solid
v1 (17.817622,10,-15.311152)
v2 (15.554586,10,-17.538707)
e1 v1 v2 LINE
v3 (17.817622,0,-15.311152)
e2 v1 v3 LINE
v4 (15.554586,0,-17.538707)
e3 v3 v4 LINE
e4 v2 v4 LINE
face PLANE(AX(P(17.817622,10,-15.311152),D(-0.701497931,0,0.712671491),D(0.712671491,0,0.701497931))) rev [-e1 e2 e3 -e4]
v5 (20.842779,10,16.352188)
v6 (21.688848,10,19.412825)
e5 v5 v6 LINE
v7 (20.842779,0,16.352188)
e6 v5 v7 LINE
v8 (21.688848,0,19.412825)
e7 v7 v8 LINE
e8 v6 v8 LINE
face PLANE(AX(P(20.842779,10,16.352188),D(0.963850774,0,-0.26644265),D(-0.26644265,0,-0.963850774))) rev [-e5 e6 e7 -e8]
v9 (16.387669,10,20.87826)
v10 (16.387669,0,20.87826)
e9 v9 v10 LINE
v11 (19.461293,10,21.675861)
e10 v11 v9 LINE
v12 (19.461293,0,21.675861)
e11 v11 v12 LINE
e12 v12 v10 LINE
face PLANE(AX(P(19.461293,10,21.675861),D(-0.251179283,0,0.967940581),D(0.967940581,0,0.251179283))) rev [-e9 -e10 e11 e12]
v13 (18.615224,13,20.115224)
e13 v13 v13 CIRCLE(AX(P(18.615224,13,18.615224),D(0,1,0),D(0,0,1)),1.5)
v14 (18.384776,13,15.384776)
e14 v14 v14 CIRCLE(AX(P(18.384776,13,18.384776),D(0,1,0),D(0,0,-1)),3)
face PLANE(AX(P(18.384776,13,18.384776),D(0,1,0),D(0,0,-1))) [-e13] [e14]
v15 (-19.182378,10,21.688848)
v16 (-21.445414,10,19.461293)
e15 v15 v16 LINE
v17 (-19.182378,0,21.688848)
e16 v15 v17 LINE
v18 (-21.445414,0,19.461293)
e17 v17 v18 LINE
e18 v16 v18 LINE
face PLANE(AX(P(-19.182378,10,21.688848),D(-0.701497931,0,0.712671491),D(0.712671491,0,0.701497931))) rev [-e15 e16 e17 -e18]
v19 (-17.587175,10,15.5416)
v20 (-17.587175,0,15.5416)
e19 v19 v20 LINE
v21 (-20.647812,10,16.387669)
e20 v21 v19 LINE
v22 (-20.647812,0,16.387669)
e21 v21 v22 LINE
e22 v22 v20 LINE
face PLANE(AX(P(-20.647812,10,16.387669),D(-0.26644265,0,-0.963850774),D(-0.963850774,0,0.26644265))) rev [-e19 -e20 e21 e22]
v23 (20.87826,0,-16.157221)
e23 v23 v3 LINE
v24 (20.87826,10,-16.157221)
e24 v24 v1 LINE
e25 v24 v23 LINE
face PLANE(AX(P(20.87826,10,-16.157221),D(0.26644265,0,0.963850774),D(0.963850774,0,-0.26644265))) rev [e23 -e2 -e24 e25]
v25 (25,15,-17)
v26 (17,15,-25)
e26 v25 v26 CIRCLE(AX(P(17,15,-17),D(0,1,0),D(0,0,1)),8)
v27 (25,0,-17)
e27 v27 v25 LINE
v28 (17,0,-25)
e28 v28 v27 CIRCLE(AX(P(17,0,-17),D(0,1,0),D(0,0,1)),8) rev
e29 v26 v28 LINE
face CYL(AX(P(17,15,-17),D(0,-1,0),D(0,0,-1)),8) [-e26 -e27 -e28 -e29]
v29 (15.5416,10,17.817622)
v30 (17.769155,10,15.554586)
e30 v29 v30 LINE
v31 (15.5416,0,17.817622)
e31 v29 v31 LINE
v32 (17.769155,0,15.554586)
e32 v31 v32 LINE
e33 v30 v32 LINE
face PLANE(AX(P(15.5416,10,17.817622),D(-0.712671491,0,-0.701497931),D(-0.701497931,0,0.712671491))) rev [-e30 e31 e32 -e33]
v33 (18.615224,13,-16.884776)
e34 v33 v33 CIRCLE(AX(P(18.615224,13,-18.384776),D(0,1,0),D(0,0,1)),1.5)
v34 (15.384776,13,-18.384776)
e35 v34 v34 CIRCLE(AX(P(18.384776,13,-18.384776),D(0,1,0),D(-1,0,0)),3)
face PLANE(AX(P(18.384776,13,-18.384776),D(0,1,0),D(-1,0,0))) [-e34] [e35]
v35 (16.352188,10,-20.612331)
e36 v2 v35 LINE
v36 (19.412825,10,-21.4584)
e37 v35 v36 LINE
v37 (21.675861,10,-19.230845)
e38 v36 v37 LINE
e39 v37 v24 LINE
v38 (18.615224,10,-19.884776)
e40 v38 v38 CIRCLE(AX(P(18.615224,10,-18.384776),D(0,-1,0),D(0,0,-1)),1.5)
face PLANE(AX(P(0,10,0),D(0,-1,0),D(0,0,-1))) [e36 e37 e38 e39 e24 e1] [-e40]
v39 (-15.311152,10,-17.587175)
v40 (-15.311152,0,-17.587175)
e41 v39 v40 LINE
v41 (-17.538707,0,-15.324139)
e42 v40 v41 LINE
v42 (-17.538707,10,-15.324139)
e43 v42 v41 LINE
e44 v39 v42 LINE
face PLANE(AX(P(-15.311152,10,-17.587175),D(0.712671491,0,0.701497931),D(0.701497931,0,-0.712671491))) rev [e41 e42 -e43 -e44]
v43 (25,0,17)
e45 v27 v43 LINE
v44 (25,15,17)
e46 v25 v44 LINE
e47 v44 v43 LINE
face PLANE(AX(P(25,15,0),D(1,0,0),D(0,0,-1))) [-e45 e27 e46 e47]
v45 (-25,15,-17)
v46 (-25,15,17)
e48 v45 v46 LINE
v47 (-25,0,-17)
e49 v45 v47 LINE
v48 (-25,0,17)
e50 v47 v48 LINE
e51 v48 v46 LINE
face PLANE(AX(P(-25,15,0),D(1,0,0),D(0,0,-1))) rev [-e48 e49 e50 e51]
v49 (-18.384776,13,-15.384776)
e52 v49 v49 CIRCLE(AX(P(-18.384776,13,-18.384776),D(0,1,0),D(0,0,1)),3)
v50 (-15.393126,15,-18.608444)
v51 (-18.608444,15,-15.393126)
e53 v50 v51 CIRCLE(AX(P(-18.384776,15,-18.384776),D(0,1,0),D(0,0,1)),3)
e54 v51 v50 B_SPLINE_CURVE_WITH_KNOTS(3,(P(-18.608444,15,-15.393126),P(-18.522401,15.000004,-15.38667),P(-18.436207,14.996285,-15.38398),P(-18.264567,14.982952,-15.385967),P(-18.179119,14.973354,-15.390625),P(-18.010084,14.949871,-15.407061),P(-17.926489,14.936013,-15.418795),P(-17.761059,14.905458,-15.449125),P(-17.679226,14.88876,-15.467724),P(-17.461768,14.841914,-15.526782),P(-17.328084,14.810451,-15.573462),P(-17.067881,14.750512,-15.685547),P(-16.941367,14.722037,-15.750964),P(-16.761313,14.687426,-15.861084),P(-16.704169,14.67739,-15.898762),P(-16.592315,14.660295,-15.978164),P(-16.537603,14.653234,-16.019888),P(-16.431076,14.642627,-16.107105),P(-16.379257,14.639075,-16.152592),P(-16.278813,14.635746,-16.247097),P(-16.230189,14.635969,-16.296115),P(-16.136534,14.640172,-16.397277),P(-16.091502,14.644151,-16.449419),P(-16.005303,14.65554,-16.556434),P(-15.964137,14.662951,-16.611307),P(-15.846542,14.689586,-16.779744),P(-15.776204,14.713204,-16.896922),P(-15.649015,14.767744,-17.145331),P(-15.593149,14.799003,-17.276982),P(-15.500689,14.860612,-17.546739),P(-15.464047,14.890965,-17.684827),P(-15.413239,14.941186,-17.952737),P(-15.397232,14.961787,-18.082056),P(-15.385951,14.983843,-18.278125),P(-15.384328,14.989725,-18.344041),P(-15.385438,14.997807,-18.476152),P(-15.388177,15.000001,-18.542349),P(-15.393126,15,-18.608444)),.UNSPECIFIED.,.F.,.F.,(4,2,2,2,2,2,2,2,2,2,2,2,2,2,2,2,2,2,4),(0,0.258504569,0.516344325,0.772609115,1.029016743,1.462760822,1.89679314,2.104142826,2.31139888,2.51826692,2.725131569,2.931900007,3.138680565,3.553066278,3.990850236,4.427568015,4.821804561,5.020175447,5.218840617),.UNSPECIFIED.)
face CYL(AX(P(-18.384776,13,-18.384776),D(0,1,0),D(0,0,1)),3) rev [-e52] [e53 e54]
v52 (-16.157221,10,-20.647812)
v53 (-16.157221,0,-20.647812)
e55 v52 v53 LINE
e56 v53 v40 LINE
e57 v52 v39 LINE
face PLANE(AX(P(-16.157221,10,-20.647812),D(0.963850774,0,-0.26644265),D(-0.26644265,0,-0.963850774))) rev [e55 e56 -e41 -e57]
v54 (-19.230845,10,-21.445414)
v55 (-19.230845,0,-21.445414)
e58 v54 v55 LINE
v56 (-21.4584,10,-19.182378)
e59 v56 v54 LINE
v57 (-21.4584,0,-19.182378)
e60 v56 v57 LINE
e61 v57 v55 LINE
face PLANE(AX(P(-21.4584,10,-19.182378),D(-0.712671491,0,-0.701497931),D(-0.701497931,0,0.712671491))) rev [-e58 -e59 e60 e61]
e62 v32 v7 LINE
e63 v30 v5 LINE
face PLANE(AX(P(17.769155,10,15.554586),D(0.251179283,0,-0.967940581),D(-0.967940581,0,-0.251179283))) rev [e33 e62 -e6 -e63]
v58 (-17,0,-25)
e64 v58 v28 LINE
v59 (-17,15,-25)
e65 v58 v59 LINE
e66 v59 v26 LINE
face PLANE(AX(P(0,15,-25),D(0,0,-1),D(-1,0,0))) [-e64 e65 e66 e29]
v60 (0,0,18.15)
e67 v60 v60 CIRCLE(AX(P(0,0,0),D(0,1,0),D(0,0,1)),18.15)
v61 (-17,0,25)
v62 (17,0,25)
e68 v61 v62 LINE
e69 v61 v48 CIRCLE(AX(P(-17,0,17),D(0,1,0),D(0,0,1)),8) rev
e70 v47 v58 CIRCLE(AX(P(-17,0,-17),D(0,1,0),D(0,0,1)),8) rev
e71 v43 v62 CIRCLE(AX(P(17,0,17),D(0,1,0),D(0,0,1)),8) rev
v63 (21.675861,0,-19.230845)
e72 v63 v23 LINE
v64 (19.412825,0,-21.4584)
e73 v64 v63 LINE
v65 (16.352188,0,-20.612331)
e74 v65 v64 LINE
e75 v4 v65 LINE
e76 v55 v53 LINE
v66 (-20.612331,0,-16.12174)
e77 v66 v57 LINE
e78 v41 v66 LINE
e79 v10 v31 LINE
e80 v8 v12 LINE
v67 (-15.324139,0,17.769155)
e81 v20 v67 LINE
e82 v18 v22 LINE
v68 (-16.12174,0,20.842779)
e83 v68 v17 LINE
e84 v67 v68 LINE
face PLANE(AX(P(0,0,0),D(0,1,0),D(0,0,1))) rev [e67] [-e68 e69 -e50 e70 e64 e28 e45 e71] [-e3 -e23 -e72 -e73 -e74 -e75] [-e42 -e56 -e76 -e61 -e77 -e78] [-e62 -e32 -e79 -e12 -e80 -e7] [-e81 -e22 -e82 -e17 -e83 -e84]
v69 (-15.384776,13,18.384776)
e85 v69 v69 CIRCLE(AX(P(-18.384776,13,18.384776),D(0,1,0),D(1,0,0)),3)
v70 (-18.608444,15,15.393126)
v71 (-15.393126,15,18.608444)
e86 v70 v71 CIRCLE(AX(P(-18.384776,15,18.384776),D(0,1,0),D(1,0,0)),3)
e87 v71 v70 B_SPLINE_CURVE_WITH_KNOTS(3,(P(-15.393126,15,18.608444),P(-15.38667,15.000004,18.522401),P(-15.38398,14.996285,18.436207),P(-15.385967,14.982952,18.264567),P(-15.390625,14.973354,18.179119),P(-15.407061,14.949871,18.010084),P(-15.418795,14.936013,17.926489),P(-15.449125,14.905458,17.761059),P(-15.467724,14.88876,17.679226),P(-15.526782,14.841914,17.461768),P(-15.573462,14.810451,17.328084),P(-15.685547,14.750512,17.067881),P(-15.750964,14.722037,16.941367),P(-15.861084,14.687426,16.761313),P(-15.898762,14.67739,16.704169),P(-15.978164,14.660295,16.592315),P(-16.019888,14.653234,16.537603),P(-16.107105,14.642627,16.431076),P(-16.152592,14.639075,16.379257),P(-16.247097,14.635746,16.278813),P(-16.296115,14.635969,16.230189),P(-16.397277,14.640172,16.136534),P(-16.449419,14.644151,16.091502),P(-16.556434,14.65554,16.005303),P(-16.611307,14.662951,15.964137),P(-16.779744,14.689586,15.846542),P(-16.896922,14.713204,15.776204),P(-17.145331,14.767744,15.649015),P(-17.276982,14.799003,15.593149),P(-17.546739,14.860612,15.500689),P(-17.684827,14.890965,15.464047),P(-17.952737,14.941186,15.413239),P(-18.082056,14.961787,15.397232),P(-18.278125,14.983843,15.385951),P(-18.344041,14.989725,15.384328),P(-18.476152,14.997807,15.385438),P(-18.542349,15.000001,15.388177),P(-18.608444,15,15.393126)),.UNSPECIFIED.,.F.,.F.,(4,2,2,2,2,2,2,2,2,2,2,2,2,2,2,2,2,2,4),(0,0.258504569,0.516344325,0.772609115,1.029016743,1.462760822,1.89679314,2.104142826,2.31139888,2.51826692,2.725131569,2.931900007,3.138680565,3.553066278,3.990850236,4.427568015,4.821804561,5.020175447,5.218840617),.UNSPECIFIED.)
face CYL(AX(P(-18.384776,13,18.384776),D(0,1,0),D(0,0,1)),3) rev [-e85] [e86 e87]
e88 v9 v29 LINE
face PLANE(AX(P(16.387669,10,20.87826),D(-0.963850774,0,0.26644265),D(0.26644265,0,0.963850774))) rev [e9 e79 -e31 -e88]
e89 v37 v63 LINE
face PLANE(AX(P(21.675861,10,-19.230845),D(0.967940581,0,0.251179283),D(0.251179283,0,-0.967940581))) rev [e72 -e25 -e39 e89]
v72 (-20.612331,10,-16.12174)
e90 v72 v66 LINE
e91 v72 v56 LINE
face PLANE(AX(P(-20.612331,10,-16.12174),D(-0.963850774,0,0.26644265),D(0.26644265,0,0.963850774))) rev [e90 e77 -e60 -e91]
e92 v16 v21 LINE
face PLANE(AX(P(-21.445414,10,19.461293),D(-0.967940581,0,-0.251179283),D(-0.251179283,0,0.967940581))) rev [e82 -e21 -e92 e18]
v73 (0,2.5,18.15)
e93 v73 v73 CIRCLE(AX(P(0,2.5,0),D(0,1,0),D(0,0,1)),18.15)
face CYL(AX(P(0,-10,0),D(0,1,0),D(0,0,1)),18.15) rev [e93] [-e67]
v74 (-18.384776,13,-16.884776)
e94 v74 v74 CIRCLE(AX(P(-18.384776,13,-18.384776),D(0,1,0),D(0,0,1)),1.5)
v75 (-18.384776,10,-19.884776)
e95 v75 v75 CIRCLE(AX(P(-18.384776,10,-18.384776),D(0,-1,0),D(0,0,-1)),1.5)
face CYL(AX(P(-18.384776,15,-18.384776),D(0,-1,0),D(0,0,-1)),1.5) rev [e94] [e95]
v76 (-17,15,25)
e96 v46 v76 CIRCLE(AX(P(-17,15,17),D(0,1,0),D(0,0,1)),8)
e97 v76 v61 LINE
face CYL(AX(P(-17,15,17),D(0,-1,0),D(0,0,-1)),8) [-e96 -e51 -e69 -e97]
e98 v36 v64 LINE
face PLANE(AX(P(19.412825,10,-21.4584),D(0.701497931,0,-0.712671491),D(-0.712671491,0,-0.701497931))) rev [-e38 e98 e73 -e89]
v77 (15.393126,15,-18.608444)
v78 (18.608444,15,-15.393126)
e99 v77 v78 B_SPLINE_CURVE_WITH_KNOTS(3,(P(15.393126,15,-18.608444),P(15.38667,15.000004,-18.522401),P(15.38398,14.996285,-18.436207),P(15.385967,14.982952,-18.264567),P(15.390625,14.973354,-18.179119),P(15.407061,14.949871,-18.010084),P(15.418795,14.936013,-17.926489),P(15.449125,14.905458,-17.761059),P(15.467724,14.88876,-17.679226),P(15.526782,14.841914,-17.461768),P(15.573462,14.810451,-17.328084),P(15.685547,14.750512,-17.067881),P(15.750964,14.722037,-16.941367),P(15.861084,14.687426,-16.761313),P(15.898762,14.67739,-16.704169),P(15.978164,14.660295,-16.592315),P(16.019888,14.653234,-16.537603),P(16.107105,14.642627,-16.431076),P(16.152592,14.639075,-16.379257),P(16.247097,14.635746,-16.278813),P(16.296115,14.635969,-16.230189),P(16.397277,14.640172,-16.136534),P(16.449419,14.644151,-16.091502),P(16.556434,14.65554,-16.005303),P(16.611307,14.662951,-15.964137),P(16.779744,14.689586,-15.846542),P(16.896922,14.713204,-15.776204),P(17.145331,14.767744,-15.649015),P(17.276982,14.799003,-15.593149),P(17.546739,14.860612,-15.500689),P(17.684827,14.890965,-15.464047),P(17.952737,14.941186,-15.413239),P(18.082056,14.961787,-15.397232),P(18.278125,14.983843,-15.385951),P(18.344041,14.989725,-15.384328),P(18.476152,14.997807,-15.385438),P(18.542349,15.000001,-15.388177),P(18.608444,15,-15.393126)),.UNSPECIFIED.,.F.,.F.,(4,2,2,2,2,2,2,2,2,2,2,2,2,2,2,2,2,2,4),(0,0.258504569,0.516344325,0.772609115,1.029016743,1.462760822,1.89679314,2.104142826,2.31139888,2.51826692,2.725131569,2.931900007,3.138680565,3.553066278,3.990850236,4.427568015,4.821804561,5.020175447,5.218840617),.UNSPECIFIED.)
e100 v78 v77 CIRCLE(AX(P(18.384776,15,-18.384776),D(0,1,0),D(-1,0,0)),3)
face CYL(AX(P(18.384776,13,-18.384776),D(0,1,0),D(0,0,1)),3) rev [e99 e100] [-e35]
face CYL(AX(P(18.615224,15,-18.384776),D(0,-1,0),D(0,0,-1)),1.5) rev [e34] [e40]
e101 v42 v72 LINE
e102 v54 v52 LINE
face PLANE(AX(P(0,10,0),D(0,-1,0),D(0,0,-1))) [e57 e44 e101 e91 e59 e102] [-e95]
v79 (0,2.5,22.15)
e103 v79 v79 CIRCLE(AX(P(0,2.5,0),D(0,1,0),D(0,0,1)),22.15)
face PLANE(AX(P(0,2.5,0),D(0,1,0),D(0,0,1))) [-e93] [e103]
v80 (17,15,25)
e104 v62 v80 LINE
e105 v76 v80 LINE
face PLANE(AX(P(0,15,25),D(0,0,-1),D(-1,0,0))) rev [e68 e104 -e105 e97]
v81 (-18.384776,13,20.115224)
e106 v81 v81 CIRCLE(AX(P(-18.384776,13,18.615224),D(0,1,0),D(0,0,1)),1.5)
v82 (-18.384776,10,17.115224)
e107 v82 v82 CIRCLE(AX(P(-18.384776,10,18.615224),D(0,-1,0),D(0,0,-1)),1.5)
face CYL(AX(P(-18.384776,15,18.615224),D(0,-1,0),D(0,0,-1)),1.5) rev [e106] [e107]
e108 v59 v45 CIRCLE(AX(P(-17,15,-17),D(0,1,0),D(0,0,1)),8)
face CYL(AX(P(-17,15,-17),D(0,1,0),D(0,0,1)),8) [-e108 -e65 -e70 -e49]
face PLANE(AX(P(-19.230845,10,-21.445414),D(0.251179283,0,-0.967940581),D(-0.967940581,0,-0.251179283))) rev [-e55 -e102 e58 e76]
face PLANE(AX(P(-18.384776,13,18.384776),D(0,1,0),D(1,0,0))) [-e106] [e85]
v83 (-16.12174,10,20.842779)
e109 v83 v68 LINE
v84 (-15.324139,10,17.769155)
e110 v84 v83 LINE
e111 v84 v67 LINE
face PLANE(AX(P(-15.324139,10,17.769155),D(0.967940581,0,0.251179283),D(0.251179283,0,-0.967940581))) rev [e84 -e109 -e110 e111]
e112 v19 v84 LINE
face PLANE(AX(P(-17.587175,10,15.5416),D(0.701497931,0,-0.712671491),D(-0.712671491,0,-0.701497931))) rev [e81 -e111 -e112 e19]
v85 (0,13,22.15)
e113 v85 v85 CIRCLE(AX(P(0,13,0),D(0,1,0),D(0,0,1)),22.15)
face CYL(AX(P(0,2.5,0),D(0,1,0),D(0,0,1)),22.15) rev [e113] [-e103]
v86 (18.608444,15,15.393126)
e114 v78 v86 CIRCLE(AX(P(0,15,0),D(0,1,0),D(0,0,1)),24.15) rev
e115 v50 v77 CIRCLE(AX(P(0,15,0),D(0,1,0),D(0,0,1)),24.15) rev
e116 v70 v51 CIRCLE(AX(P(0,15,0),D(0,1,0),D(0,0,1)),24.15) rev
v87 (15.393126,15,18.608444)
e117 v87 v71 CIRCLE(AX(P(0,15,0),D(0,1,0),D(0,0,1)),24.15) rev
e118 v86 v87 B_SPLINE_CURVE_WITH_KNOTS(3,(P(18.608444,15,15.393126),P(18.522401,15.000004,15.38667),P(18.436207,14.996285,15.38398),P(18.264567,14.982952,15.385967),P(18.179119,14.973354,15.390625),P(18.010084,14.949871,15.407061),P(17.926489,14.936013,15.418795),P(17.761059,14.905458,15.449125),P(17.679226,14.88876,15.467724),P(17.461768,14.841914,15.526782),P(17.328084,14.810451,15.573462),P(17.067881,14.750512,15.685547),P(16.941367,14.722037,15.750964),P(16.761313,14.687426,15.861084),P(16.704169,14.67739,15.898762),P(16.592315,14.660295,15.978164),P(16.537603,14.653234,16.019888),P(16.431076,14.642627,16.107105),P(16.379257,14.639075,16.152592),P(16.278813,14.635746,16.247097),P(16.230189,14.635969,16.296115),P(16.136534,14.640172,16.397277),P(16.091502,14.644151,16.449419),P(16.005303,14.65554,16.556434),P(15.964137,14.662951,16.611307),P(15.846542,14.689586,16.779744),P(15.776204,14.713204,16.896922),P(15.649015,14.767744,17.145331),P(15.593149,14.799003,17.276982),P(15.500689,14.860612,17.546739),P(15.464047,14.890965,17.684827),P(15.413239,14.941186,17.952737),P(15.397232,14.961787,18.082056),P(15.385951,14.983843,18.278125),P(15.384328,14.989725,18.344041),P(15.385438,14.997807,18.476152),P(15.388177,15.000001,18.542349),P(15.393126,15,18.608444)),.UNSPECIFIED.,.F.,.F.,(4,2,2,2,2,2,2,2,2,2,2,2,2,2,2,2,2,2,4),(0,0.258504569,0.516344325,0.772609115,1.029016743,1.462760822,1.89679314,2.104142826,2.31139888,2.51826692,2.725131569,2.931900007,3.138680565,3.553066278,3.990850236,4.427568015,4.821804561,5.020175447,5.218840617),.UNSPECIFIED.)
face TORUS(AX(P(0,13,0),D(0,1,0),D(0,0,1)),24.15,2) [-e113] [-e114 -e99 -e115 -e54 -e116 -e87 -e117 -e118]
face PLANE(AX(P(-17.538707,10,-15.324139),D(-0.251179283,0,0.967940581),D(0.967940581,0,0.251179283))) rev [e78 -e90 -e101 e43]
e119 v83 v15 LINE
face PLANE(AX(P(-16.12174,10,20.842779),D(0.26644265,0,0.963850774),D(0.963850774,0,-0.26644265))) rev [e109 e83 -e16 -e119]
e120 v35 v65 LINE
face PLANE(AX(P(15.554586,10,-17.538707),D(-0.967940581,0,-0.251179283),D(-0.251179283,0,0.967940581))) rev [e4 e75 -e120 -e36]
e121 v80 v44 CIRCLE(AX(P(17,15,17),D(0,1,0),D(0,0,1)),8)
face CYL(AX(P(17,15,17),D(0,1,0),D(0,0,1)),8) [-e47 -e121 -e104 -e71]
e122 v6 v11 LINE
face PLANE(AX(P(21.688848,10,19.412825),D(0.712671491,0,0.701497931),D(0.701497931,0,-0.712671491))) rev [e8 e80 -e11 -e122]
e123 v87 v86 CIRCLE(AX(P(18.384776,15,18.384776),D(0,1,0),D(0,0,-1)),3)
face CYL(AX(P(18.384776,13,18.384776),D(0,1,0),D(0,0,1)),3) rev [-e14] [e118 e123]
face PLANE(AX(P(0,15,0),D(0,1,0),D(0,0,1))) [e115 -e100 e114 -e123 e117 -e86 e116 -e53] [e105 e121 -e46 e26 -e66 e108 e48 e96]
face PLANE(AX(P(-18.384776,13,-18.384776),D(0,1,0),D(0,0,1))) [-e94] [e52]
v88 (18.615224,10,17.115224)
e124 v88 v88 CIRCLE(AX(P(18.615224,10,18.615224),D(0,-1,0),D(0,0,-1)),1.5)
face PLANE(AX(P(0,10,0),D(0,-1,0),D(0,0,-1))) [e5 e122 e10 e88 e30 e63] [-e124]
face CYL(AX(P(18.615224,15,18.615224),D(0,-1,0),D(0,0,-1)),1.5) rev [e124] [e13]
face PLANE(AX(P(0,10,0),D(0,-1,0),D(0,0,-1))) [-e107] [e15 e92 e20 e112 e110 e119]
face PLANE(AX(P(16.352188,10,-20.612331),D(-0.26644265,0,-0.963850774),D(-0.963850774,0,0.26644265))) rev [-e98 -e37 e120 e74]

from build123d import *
from build123d.topology import SkipClean

# Parameters (mm, degrees)
SKETCH_1_R               = 25
EXTRUDE_1_DEPTH          = 15
SKETCH_2_R               = 22.15
CUT_EXTRUDE_1_DEPTH      = 12.5
SKETCH_3_R               = 18.15
CUT_EXTRUDE_2_DEPTH      = 12.5
EXTRUDE_2_DEPTH          = 15
FILLET_1_R               = 8
CUT_EXTRUDE_START        = -15
SKETCH_5_R               = 1.5
CUT_EXTRUDE_3_DEPTH      = 15
SKETCH_6_R               = 3
CUT_EXTRUDE_4_DEPTH      = 2
PATTERN_CIRCULAR_1_COUNT = 4
CUT_EXTRUDE_5_DEPTH      = 10
FILLET_2_R               = 2


with BuildPart() as part:
    # 草图1 → 凸台-拉伸1 (new body)
    with BuildSketch(Plane(origin=(0, 0, 0), x_dir=(1, 0, 0), z_dir=(0, 1, 0))):
        with Locations(Location((0, 0, 0), (0, 0, 270))):
            Circle(SKETCH_1_R)
    extrude(amount=EXTRUDE_1_DEPTH)

    # 草图2 → 切除-拉伸1 (cut)
    with BuildSketch(Plane(origin=(0, 15, 0), x_dir=(1, 0, 0), z_dir=(0, 1, 0))):
        with Locations(Location((0, 0, 0), (0, 0, 270))):
            Circle(SKETCH_2_R)
    extrude(amount=-CUT_EXTRUDE_1_DEPTH, mode=Mode.SUBTRACT)

    # 草图3 → 切除-拉伸2 (cut)
    with BuildSketch(Plane(origin=(0, 2.5, 0), x_dir=(1, 0, 0), z_dir=(0, 1, 0))):
        with Locations(Location((0, 0, 0), (0, 0, 270))):
            Circle(SKETCH_3_R)
    extrude(amount=-CUT_EXTRUDE_2_DEPTH, mode=Mode.SUBTRACT)

    # 草图4 → 凸台-拉伸2 (add)
    with BuildSketch(Plane(origin=(0, 0, 0), x_dir=(1, 0, 0), z_dir=(0, 1, 0))):
        with BuildLine():
            Line((0, 25), (-25, 25))
            Line((-25, 25), (-25, 2.6e-08))
            ThreePointArc((-25, 2.6e-08), (-23.301207713, 9.058350794), (-18.435702489, 16.885641052))
            ThreePointArc((-18.435702489, 16.885641052), (-19.445436483, 19.445436483), (-16.885641052, 18.435702489))
            ThreePointArc((-16.885641052, 18.435702489), (-9.058350782, 23.301207718), (0, 25))
        make_face()
        with BuildLine():
            Line((25, 25), (0, 25))
            ThreePointArc((0, 25), (9.210354363, 23.241544108), (17.125028574, 18.213549801))
            ThreePointArc((17.125028574, 18.213549801), (19.682469279, 19.438809921), (18.425448396, 16.896829626))
            ThreePointArc((18.425448396, 16.896829626), (23.298457137, 9.065423048), (25, 0))
            Line((25, 0), (25, 25))
        make_face()
        with BuildLine():
            ThreePointArc((-18.213549801, -17.125028574), (-23.241544113, -9.210354351), (-25, 2.6e-08))
            Line((-25, 2.6e-08), (-25, -25))
            Line((-25, -25), (-5.8e-08, -25))
            ThreePointArc((-5.8e-08, -25), (-9.065423076, -23.298457126), (-16.896829626, -18.425448396))
            ThreePointArc((-16.896829626, -18.425448396), (-19.438809921, -19.682469279), (-18.213549801, -17.125028574))
        make_face()
        with BuildLine():
            Line((25, -25), (25, 0))
            ThreePointArc((25, 0), (23.22561674, -9.250444694), (18.154341838, -17.18778265))
            ThreePointArc((18.154341838, -17.18778265), (19.675883861, -19.675883861), (17.18778265, -18.154341838))
            ThreePointArc((17.18778265, -18.154341838), (9.250444666, -23.225616751), (-5.8e-08, -25))
            Line((-5.8e-08, -25), (25, -25))
        make_face()
    extrude(amount=EXTRUDE_2_DEPTH)

    # 圆角1
    fillet_1_edges = [part.edges().sort_by_distance(p)[0] for p in [
        (-25, 7.5, -25),
        (25, 7.5, -25),
        (-25, 7.5, 25),
        (25, 7.5, 25),
    ]]
    fillet(fillet_1_edges, radius=FILLET_1_R)

    # 草图5 → 切除-拉伸3 (cut)
    with BuildSketch(Plane(origin=(0, 15, 0), x_dir=(1, 0, 0), z_dir=(0, 1, 0)).offset(CUT_EXTRUDE_START)):
        with Locations(Location((-18.384776311, 18.384776311, 0), (0, 0, 270))):
            Circle(SKETCH_5_R)
        with Locations(Location((18.615223689, 18.384776311, 0), (0, 0, 270))):
            Circle(SKETCH_5_R)
        with Locations(Location((18.615223689, -18.615223689, 0), (0, 0, 270))):
            Circle(SKETCH_5_R)
        with Locations(Location((-18.384776311, -18.615223689, 0), (0, 0, 270))):
            Circle(SKETCH_5_R)
    extrude(amount=CUT_EXTRUDE_3_DEPTH, mode=Mode.SUBTRACT)

    # 草图6 → 切除-拉伸4 (cut)
    with BuildSketch(Plane(origin=(0, 15, 0), x_dir=(1, 0, 0), z_dir=(0, 1, 0))):
        with Locations(Location((-18.384776311, 18.384776311, 0), (0, 0, 270))):
            Circle(SKETCH_6_R)
    cut_extrude_4 = extrude(amount=-CUT_EXTRUDE_4_DEPTH, mode=Mode.SUBTRACT)

    # 阵列(圆周)1: 切除-拉伸4 ×4 about axis
    with SkipClean():  # the faces are left unmerged after this step: merging them gives an invalid solid
        pattern_circular_1_axis = Axis((0, 0, 0), (0, 1, 0))
        for i in range(1, PATTERN_CIRCULAR_1_COUNT):
            add(cut_extrude_4.rotate(pattern_circular_1_axis, i * 360 / PATTERN_CIRCULAR_1_COUNT), mode=Mode.SUBTRACT)

    # 草图7 → 切除-拉伸5 (cut)
    with SkipClean():  # the faces are left unmerged after this step: merging them gives an invalid solid
        with BuildSketch(Plane.XZ):
            Polygon((15.541599538, 17.817622342), (17.769154642, 15.554586419), (20.842778794, 16.352187766), (21.688847841, 19.412825036), (19.461292736, 21.67586096), (16.387668585, 20.878259612), align=None)
            Polygon((-15.32413904, 17.769154642), (-16.121740388, 20.842778794), (-19.182377658, 21.688847841), (-21.445413581, 19.461292736), (-20.647812234, 16.387668585), (-17.587174964, 15.541599538), align=None)
            Polygon((17.817622342, -15.311152159), (15.554586419, -17.538707264), (16.352187766, -20.612331415), (19.412825036, -21.458400462), (21.67586096, -19.230845358), (20.878259612, -16.157221206), align=None)
            Polygon((-15.311152159, -17.587174964), (-17.538707264, -15.32413904), (-20.612331415, -16.121740388), (-21.458400462, -19.182377658), (-19.230845358, -21.445413581), (-16.157221206, -20.647812234), align=None)
        extrude(amount=-CUT_EXTRUDE_5_DEPTH, mode=Mode.SUBTRACT)

    # 圆角2
    # the kernel refuses this fillet: 2 mm, written as the material it takes off along each edge
    with BuildSketch(Plane(origin=(0, 15, 0), x_dir=(0, 0, 1), z_dir=(-1, 0, 0))) as fillet_2_piece_1:
        with BuildLine():
            CenterArc((22.15 + FILLET_2_R, -FILLET_2_R), FILLET_2_R, 90, 90)
            Line((22.15, -FILLET_2_R), (22.15, 0))
            Line((22.15, 0), (22.15 + FILLET_2_R, 0))
        make_face()
    revolve(axis=Axis((0, 15, 0), (0, 1, 0)), mode=Mode.SUBTRACT)


solid = part.part
